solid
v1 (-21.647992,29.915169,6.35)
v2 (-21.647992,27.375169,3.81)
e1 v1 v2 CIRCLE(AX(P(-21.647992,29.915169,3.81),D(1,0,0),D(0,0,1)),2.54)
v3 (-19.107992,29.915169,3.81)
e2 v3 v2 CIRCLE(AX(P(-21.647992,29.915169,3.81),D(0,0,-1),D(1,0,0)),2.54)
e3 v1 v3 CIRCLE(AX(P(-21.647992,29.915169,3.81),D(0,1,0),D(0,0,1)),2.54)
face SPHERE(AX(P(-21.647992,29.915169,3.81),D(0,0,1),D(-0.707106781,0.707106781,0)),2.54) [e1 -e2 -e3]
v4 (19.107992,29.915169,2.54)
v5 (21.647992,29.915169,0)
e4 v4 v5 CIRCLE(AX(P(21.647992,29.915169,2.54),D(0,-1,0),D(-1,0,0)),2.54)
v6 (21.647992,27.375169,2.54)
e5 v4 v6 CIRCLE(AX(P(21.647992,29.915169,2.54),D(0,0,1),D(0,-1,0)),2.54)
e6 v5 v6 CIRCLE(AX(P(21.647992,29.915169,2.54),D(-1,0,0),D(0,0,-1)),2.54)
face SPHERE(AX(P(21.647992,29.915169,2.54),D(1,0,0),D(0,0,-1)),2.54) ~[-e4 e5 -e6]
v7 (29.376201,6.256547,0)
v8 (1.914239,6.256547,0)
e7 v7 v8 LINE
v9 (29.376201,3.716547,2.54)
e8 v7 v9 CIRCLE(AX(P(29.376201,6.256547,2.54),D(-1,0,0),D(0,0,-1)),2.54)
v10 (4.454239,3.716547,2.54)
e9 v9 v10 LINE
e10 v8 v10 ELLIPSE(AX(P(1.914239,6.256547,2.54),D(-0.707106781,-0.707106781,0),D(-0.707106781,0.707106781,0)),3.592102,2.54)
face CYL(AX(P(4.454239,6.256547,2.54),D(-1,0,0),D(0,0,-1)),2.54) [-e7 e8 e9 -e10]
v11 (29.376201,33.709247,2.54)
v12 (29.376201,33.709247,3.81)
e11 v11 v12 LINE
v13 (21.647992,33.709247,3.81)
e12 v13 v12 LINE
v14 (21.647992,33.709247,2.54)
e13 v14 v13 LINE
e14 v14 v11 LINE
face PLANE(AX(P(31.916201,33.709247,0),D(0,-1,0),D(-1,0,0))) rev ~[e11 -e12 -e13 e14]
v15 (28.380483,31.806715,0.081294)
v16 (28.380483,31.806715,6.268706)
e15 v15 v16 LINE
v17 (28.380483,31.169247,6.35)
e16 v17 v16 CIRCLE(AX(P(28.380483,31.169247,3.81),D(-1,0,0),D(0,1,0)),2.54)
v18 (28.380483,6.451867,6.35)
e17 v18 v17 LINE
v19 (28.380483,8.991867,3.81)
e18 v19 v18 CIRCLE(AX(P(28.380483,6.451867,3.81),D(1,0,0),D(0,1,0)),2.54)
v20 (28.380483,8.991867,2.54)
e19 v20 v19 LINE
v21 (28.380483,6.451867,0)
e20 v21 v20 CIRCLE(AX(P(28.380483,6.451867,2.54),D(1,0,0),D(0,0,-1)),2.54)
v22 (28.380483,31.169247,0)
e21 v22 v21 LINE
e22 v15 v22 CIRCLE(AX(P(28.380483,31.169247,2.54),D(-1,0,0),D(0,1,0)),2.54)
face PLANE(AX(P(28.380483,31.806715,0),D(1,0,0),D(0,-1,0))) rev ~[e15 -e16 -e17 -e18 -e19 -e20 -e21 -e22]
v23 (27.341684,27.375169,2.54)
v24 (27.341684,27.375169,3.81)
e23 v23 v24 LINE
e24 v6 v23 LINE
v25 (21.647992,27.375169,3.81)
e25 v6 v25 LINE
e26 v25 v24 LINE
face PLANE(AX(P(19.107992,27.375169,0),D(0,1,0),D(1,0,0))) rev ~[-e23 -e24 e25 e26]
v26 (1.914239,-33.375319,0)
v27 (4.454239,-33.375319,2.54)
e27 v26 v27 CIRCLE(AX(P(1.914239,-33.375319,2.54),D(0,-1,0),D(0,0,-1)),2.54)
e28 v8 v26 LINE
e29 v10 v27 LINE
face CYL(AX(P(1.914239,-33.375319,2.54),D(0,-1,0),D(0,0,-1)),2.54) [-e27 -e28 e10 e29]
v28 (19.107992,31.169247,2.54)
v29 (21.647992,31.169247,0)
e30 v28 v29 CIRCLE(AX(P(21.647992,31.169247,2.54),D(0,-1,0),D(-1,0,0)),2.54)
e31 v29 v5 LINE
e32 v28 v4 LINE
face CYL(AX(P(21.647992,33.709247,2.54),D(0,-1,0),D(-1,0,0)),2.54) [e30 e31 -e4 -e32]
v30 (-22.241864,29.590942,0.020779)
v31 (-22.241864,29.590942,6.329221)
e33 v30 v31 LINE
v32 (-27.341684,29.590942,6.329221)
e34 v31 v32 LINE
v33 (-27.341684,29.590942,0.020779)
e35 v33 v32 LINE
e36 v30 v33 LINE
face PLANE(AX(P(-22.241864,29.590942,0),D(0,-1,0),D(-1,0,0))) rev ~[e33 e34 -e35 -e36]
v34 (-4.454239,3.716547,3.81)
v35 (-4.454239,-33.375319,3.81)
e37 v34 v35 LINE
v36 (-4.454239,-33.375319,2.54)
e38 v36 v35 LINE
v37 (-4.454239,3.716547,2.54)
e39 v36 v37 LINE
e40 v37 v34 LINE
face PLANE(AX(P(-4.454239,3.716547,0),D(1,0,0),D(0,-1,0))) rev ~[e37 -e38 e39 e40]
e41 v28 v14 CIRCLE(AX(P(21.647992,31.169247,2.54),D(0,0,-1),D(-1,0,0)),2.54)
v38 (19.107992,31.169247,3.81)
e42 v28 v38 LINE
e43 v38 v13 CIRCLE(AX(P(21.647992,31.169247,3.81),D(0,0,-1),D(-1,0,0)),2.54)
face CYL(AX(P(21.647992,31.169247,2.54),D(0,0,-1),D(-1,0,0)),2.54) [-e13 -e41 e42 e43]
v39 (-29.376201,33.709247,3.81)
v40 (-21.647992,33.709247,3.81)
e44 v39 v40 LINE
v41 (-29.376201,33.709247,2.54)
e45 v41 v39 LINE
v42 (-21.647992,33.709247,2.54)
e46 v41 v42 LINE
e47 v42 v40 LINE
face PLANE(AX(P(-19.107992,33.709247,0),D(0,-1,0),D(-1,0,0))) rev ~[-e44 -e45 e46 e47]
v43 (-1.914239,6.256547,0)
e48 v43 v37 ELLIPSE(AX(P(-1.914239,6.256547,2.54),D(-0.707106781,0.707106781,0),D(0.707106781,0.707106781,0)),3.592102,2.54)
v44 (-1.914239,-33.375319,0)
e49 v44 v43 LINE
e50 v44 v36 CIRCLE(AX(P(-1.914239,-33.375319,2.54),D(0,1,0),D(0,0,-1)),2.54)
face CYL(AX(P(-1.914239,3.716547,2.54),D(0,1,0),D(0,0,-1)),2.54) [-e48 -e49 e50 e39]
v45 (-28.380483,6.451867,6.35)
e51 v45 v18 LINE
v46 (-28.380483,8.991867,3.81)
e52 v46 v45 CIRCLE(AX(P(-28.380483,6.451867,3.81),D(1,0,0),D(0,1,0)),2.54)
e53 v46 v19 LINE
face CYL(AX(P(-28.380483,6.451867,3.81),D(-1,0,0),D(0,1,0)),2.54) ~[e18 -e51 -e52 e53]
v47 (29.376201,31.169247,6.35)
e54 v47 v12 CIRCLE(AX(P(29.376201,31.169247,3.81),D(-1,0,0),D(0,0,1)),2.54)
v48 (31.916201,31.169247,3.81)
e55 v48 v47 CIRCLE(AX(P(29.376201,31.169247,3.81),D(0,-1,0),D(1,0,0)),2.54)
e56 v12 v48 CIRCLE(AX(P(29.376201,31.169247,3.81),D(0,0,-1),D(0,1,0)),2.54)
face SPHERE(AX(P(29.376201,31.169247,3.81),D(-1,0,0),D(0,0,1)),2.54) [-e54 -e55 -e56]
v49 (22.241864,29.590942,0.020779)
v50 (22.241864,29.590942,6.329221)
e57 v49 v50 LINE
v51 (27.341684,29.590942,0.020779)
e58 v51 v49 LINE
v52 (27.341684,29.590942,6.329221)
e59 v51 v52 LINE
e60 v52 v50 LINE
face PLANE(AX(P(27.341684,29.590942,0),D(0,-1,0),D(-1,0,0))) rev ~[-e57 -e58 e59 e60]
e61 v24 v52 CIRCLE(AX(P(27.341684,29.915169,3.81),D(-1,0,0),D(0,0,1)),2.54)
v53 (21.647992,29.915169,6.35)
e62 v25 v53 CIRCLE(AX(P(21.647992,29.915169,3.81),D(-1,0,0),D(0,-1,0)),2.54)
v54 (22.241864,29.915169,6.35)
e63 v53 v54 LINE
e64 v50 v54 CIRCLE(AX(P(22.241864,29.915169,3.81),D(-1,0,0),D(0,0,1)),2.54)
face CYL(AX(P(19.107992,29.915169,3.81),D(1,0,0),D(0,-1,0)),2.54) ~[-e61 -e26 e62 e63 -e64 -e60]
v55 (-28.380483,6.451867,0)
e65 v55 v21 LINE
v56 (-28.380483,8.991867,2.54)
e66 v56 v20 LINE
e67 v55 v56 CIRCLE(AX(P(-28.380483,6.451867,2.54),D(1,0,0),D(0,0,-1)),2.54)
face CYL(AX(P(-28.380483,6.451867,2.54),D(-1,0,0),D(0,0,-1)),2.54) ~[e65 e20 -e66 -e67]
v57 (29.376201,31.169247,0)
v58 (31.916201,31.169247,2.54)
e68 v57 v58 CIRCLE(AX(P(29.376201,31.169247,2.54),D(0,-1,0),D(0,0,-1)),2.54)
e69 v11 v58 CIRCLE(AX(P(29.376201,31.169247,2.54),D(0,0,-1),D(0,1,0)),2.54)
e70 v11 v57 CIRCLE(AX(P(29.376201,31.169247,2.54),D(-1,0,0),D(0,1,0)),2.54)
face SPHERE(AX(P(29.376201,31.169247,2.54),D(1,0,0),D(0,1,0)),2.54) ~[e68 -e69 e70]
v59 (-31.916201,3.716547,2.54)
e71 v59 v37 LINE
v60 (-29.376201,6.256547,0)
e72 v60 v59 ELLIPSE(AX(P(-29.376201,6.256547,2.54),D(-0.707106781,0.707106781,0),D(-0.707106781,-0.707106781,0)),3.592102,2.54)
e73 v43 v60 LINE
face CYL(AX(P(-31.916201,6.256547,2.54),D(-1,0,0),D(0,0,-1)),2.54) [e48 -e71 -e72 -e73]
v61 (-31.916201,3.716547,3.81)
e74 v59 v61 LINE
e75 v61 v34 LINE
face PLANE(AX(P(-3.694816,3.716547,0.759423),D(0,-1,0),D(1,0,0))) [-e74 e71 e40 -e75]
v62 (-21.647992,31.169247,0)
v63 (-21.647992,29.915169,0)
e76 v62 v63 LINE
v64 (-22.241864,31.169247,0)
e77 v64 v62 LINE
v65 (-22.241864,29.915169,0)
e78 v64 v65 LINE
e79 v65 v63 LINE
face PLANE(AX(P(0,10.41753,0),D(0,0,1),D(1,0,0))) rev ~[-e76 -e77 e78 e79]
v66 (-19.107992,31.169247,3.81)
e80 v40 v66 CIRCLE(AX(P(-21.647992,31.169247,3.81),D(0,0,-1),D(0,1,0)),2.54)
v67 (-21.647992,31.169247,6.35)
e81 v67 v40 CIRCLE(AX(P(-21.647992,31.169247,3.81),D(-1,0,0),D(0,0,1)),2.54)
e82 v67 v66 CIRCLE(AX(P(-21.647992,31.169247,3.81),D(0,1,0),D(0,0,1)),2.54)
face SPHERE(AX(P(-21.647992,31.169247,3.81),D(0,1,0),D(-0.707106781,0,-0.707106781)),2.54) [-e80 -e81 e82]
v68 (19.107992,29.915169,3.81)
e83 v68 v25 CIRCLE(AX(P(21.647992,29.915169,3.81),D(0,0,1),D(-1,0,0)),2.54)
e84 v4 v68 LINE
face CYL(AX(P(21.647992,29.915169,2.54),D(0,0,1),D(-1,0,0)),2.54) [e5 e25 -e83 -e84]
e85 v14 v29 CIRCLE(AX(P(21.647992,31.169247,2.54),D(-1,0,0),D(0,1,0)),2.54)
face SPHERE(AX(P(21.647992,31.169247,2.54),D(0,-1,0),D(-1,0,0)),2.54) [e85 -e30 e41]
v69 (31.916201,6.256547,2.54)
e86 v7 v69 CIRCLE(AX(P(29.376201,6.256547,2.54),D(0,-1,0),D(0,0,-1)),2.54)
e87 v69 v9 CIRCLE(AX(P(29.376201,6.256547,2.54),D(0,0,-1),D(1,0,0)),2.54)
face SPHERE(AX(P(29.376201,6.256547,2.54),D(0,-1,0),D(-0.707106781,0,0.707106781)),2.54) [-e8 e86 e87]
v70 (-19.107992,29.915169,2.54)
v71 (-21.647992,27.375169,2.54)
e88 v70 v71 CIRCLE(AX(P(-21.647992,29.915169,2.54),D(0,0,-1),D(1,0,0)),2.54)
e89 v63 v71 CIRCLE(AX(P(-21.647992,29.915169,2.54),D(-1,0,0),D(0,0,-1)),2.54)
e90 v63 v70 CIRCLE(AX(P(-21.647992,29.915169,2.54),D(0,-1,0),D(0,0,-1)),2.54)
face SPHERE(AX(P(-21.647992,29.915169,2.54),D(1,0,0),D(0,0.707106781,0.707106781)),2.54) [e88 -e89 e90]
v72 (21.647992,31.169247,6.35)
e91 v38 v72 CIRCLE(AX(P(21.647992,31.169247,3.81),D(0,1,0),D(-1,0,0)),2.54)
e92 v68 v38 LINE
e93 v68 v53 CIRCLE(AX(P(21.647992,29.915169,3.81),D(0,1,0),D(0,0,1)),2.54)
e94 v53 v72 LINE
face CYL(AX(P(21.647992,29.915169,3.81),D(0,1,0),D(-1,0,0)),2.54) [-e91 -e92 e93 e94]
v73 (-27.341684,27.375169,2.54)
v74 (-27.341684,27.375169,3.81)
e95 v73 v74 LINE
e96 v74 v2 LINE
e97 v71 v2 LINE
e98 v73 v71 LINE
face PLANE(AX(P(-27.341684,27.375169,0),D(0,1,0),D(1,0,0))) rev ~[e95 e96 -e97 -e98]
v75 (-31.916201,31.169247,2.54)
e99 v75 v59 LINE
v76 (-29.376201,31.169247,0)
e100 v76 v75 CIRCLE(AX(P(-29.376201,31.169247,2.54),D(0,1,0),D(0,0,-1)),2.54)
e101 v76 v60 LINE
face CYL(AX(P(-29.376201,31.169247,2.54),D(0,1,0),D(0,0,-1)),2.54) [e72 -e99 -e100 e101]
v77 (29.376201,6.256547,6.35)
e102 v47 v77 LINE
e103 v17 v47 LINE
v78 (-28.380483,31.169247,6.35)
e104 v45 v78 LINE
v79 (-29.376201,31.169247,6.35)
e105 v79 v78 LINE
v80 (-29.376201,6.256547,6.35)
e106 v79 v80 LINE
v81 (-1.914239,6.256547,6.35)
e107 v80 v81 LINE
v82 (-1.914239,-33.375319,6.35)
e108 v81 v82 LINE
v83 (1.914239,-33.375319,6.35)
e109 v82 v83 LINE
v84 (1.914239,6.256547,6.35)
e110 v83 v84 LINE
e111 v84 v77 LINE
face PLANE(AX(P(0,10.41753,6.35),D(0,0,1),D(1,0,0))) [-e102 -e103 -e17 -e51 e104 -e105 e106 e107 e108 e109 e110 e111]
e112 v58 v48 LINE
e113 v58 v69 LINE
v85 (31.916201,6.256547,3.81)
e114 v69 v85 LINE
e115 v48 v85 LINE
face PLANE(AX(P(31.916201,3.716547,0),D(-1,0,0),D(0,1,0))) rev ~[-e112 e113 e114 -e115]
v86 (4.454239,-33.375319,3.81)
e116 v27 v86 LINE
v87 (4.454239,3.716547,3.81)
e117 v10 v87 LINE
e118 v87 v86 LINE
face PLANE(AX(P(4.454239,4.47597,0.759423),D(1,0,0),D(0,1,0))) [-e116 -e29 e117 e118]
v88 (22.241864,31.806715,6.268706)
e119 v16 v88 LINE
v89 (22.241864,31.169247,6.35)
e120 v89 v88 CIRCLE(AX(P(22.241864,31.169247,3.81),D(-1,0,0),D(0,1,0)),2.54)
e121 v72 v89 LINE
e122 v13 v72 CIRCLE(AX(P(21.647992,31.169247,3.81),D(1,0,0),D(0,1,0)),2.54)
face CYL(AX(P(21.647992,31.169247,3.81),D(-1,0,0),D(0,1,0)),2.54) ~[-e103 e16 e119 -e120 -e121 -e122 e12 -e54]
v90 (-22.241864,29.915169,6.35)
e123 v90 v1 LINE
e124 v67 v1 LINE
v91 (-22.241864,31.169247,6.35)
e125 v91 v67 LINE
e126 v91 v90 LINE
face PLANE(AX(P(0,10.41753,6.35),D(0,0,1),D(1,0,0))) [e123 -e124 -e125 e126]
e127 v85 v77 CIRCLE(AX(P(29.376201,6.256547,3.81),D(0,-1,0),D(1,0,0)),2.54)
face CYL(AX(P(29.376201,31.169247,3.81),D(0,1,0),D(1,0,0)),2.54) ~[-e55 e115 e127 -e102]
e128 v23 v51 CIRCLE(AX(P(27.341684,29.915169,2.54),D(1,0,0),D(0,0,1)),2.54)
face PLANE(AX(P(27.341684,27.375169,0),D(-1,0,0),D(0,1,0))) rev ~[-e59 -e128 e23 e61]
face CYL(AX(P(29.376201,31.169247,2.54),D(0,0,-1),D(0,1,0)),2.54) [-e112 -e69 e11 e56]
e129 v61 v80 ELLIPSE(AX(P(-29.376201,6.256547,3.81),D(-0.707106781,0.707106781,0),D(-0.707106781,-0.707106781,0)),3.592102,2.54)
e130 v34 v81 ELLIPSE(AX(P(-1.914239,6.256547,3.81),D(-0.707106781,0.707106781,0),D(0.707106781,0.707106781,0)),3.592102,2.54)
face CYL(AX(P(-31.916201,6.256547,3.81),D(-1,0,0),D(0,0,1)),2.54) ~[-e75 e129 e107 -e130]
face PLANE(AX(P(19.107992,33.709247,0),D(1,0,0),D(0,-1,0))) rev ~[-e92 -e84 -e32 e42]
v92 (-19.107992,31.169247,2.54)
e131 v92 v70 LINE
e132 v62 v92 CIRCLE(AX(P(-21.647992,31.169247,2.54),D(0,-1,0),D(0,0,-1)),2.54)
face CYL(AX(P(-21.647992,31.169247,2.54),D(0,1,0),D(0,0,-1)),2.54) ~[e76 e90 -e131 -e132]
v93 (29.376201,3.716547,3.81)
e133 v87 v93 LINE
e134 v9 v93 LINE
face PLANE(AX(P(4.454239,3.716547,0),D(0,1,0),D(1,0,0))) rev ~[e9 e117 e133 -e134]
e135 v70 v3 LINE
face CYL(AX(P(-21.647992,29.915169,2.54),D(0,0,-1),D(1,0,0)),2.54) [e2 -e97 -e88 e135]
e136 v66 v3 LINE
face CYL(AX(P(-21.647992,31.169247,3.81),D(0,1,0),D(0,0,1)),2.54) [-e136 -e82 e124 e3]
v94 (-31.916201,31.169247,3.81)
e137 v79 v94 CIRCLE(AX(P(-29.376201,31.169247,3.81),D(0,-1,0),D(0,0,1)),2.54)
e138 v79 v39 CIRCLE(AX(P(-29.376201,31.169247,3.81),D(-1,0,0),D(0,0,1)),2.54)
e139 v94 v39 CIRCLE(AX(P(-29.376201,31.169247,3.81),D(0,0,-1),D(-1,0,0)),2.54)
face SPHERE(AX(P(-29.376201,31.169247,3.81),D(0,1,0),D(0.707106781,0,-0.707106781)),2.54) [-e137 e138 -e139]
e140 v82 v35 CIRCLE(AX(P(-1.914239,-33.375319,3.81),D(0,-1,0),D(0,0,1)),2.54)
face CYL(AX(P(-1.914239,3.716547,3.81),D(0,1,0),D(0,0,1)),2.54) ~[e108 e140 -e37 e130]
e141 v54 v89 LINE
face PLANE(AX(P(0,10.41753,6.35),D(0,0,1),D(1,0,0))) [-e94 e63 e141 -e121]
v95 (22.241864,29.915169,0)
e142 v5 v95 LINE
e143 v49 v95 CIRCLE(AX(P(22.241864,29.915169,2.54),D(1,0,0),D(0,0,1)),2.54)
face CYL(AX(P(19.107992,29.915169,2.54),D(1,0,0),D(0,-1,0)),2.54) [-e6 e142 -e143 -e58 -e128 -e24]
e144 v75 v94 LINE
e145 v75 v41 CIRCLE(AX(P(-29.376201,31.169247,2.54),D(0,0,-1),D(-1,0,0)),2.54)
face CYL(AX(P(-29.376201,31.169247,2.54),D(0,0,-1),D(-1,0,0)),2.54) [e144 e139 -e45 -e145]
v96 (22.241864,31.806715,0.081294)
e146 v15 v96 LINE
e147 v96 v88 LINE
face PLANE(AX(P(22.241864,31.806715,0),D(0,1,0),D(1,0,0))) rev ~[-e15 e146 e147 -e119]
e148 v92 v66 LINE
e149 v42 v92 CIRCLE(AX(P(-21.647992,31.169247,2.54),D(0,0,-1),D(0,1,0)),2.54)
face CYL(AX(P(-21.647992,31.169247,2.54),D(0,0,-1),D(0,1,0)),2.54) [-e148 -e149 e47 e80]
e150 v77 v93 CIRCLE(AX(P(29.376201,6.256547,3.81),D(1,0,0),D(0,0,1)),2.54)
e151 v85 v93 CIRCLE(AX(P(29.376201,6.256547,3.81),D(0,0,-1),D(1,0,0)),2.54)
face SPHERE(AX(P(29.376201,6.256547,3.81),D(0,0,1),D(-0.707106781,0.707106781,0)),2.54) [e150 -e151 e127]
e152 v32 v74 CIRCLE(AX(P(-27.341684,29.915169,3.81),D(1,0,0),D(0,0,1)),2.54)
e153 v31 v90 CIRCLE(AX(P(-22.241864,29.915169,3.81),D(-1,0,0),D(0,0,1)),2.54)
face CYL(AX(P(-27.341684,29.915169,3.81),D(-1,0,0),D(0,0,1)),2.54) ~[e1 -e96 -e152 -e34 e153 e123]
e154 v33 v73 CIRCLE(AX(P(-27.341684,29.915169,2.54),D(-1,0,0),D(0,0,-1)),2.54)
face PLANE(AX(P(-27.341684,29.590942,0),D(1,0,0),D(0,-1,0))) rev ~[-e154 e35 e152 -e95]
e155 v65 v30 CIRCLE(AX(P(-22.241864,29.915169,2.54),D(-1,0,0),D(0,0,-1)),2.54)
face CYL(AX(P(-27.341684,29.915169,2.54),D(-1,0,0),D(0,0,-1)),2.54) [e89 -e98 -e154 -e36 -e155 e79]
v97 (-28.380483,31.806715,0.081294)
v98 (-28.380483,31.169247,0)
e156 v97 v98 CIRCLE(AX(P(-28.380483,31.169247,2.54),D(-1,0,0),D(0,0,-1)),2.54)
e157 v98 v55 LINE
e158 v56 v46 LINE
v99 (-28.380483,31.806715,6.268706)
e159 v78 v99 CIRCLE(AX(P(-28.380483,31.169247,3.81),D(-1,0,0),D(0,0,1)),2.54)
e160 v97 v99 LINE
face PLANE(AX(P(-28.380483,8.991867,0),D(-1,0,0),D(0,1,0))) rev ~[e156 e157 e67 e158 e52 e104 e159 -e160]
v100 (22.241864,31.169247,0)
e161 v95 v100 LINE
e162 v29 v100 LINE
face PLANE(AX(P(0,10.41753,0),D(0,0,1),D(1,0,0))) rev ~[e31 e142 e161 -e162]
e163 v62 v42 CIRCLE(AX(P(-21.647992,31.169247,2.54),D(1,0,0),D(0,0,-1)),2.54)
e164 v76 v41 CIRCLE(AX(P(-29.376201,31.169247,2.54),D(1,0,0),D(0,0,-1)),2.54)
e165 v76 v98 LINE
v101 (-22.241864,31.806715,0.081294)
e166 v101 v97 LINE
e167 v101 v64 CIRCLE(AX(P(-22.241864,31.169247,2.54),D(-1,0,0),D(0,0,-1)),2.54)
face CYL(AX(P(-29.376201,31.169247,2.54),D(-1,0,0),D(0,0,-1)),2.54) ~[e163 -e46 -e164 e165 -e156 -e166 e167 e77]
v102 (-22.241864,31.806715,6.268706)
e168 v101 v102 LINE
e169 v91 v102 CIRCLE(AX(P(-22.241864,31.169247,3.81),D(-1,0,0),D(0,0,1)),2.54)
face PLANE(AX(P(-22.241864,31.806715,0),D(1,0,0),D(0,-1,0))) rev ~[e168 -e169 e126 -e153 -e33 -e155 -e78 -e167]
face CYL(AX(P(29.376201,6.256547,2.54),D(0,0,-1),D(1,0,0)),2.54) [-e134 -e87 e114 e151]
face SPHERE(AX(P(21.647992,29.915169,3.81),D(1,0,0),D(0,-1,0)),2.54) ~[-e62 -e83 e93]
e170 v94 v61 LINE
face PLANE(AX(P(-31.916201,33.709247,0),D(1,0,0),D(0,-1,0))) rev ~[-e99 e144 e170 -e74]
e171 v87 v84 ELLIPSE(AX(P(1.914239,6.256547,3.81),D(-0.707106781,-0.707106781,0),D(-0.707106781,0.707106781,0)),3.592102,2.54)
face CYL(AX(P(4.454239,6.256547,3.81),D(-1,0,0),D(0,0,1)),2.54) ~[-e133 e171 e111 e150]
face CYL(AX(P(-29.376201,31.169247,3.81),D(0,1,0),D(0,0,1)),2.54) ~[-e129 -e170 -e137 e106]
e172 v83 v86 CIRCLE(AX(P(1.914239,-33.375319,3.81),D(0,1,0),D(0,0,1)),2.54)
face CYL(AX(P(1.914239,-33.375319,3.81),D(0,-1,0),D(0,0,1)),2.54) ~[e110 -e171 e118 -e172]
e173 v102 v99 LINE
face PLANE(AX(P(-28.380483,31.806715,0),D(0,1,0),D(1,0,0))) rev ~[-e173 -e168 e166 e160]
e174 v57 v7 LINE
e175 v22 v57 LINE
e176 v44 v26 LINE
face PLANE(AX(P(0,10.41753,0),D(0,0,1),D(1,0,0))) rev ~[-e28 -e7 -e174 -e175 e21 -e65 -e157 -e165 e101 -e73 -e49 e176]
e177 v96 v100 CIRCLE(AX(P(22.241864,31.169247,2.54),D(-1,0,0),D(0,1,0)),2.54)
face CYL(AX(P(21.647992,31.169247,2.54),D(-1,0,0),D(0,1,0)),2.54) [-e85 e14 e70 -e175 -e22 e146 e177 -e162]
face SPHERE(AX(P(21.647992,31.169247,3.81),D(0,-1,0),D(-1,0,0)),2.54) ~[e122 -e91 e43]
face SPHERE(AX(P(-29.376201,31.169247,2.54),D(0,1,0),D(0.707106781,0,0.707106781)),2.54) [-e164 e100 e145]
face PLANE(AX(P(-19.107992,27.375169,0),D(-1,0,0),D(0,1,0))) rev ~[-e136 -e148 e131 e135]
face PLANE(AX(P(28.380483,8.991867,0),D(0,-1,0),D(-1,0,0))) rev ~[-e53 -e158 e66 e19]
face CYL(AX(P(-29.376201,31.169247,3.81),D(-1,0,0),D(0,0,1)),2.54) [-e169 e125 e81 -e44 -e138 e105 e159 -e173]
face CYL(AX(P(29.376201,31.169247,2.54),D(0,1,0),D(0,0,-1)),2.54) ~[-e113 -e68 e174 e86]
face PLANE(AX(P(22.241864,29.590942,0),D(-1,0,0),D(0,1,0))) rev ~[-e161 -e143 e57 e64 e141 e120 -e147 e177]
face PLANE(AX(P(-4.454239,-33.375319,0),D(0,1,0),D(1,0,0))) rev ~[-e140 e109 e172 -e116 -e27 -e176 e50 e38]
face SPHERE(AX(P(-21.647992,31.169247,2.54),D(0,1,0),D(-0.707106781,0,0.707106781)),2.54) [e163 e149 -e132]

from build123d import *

# Parameters (mm, degrees)
F1_DEPTH      = 6.35
F2_F1_R       = 2.54
F2_F2_R       = 2.54
F2_F3_R       = 2.54
F2_T4_DEPTH   = 16.6182092851
F2_T6_DEPTH   = 1.27
F2_T9_ANGLE   = 90
F2_T11_ANGLE  = 90
F3_T1_DEPTH   = 5.693692497
F3_T3_DEPTH   = 1.2540775669
F3_T5_DEPTH   = 7.7282092851
F3_T7_DEPTH   = 1.27
F3_T9_DEPTH   = 24.9126996231
F3_T11_DEPTH  = 24.9219618431
F3_T13_DEPTH  = 37.0918661356
F3_T15_DEPTH  = 27.4619618431
F3_T17_DEPTH  = 27.4526996231
F3_T19_DEPTH  = 56.7609667778
F3_S23_W      = 2.5908
F3_S23_H      = 2.5908
F3_T24_DEPTH  = 2.5908
F3_S29_W      = 2.5908
F3_S29_H      = 2.5908
F3_T30_DEPTH  = 2.5908
F3_S35_W      = 2.5908
F3_S35_H      = 2.5908
F3_T36_DEPTH  = 2.5908
F3_S41_W      = 2.5908
F3_S41_H      = 2.5908
F3_T42_DEPTH  = 2.5908
F3_S47_W      = 2.5908
F3_S47_H      = 2.5908
F3_T48_DEPTH  = 2.5908
F3_S53_W      = 2.5908
F3_S53_H      = 2.5908
F3_T54_DEPTH  = 2.5908
F3_S59_W      = 2.5908
F3_S59_H      = 2.5908
F3_T60_DEPTH  = 2.5908
F3_S65_W      = 2.5908
F3_S65_H      = 2.5908
F3_T66_DEPTH  = 2.5908
F3_T70_ANGLE  = 90.0000000056
F3_T72_ANGLE  = 90.0000000056
F3_T77_DEPTH  = 31.2719618431
F3_T81_DEPTH  = 43.4418661356
F3_T88_DEPTH  = 43.4418661356
F3_T92_DEPTH  = 33.8119618431
F3_T99_DEPTH  = 33.8119618431
F3_T103_DEPTH = 33.8026996231
F3_T110_DEPTH = 31.2719618431
F3_T114_DEPTH = 43.4418661356
F3_T121_DEPTH = 43.4418661356
F3_T125_DEPTH = 33.8119618431
F3_T132_DEPTH = 33.8119618431
F3_T136_DEPTH = 33.8026996231


# Not quite as in the source:
# - a fillet or chamfer that OpenCascade refuses, or shapes differently, is made with other operations: its cross-section is extruded or revolved along the edge and cut away or added
# - two fillets or chamfers of one size are made in one step


with BuildPart() as f1:
    # F0 (on Top) → F1 (new body)
    with BuildSketch(Plane.XY):
        Polygon((-4.4542392716, -33.3753190935), (0, -33.3753190935), (4.4542392716, -33.3753190935), (4.4542392716, 3.7165470421), (31.9162011147, 3.7165470421), (31.9162011147, 8.9918673038), (31.9162011147, 33.7092466652), (28.3804833889, 33.7092466652), (19.1079918295, 33.7092466652), (19.1079918295, 31.8067148328), (19.1079918295, 27.3751690984), (22.2418643534, 27.3751690984), (27.3416843265, 27.3751690984), (27.3416843265, 29.5909419656), (22.2418643534, 29.5909419656), (22.2418643534, 31.8067148328), (28.3804833889, 31.8067148328), (28.3804833889, 8.9918673038), (4.4542392716, 8.9918673038), (0, 8.9918673038), (-4.4542392716, 8.9918673038), (-28.3804833889, 8.9918673038), (-28.3804833889, 31.8067148328), (-22.2418643534, 31.8067148328), (-22.2418643534, 29.5909419656), (-27.3416843265, 29.5909419656), (-27.3416843265, 27.3751690984), (-22.2418643534, 27.3751690984), (-19.1079918295, 27.3751690984), (-19.1079918295, 31.8067148328), (-19.1079918295, 33.7092466652), (-28.3804833889, 33.7092466652), (-31.9162011147, 33.7092466652), (-31.9162011147, 8.9918673038), (-31.9162011147, 3.7165470421), (-4.4542392716, 3.7165470421), align=None)
    extrude(amount=F1_DEPTH)

    # F2: fillet of radius 2.54 on 7 edges, made by hand

    # F2_f1
    f2_f1_edges = [f1.edges().sort_by_distance(p)[0] for p in [
        (23.224838078, 27.3751690984, 0),
    ]]
    fillet(f2_f1_edges, radius=F2_F1_R)

    # F2_f2
    f2_f2_edges = [f1.edges().sort_by_distance(p)[0] for p in [
        (23.224838078, 27.3751690984, 6.35),
    ]]
    fillet(f2_f2_edges, radius=F2_F2_R)

    # F2_f3
    f2_f3_edges = [f1.edges().sort_by_distance(p)[0] for p in [
        (19.1079918295, 27.3751690984, 3.175),
    ]]
    fillet(f2_f3_edges, radius=F2_F3_R)

    # F2_s5 → F2_t4 (cut)
    with BuildSketch(Plane.YZ.offset(21.6479918295)):
        with BuildLine():
            ThreePointArc((33.7092466652, 2.54), (32.9652978895, 0.7439487758), (31.1692466652, 0))
            Line((31.1692466652, 0), (31.1692466652, -0.0508))
            Line((31.1692466652, -0.0508), (33.7600466652, -0.0508))
            Line((33.7600466652, -0.0508), (33.7600466652, 2.54))
            Line((33.7600466652, 2.54), (33.7092466652, 2.54))
        make_face()
        with BuildLine():
            ThreePointArc((33.7092466652, 3.81), (32.9652978895, 5.6060512242), (31.1692466652, 6.35))
            Line((31.1692466652, 6.35), (31.1692466652, 6.4008))
            Line((31.1692466652, 6.4008), (33.7600466652, 6.4008))
            Line((33.7600466652, 6.4008), (33.7600466652, 3.81))
            Line((33.7600466652, 3.81), (33.7092466652, 3.81))
        make_face()
    extrude(amount=F2_T4_DEPTH, mode=Mode.SUBTRACT)

    # F2_s7 → F2_t6 (cut)
    with BuildSketch(Plane.XY.offset(2.54)):
        with BuildLine():
            ThreePointArc((19.1079918295, 31.1692466652), (19.8519406053, 32.9652978895), (21.6479918295, 33.7092466652))
            Line((21.6479918295, 33.7092466652), (21.6479918295, 33.7600466652))
            Line((21.6479918295, 33.7600466652), (19.0571918295, 33.7600466652))
            Line((19.0571918295, 33.7600466652), (19.0571918295, 31.1692466652))
            Line((19.0571918295, 31.1692466652), (19.1079918295, 31.1692466652))
        make_face()
    extrude(amount=F2_T6_DEPTH, mode=Mode.SUBTRACT)

    # F2_s8 → F2_t9 (revolve, cut)
    with BuildSketch(Plane.XY.offset(2.54)):
        with BuildLine():
            ThreePointArc((21.6479918295, 33.7092466652), (19.8519406053, 32.9652978895), (19.1079918295, 31.1692466652))
            Line((19.1079918295, 31.1692466652), (19.0571918295, 31.1692466652))
            Line((19.0571918295, 31.1692466652), (19.0571918295, 33.7600466652))
            Line((19.0571918295, 33.7600466652), (21.6479918295, 33.7600466652))
            Line((21.6479918295, 33.7600466652), (21.6479918295, 33.7092466652))
        make_face()
    revolve(axis=Axis((21.6479918295, 33.7092466652, 2.54), (0, -1, 0)), revolution_arc=F2_T9_ANGLE, mode=Mode.SUBTRACT)

    # F2_s10 → F2_t11 (revolve, cut)
    with BuildSketch(Plane.XY.offset(3.81)):
        with BuildLine():
            ThreePointArc((21.6479918295, 33.7092466652), (19.8519406053, 32.9652978895), (19.1079918295, 31.1692466652))
            Line((19.1079918295, 31.1692466652), (19.0571918295, 31.1692466652))
            Line((19.0571918295, 31.1692466652), (19.0571918295, 33.7600466652))
            Line((19.0571918295, 33.7600466652), (21.6479918295, 33.7600466652))
            Line((21.6479918295, 33.7600466652), (21.6479918295, 33.7092466652))
        make_face()
    revolve(axis=Axis((21.6479918295, 33.7092466652, 3.81), (0, 1, 0)), revolution_arc=F2_T11_ANGLE, mode=Mode.SUBTRACT)

    # F3: fillet of radius 2.54 on 27 edges, made by hand

    # F3_s2 → F3_t1 (cut)
    with BuildSketch(Plane.YZ.offset(-27.3416843265)):
        with BuildLine():
            ThreePointArc((29.9151690984, 0), (28.1191178742, 0.7439487758), (27.3751690984, 2.54))
            Line((27.3751690984, 2.54), (27.3243690984, 2.54))
            Line((27.3243690984, 2.54), (27.3243690984, -0.0508))
            Line((27.3243690984, -0.0508), (29.9151690984, -0.0508))
            Line((29.9151690984, -0.0508), (29.9151690984, 0))
        make_face()
        with BuildLine():
            ThreePointArc((29.9151690984, 6.35), (28.1191178742, 5.6060512242), (27.3751690984, 3.81))
            Line((27.3751690984, 3.81), (27.3243690984, 3.81))
            Line((27.3243690984, 3.81), (27.3243690984, 6.4008))
            Line((27.3243690984, 6.4008), (29.9151690984, 6.4008))
            Line((29.9151690984, 6.4008), (29.9151690984, 6.35))
        make_face()
    extrude(amount=F3_T1_DEPTH, mode=Mode.SUBTRACT)

    # F3_s4 → F3_t3 (cut)
    with BuildSketch(Plane.XZ.offset(-31.1692466652)):
        with BuildLine():
            ThreePointArc((-21.6479918295, 6.35), (-19.8519406053, 5.6060512242), (-19.1079918295, 3.81))
            Line((-19.1079918295, 3.81), (-19.0571918295, 3.81))
            Line((-19.0571918295, 3.81), (-19.0571918295, 6.4008))
            Line((-19.0571918295, 6.4008), (-21.6479918295, 6.4008))
            Line((-21.6479918295, 6.4008), (-21.6479918295, 6.35))
        make_face()
        with BuildLine():
            ThreePointArc((-21.6479918295, 0), (-19.8519406053, 0.7439487758), (-19.1079918295, 2.54))
            Line((-19.1079918295, 2.54), (-19.0571918295, 2.54))
            Line((-19.0571918295, 2.54), (-19.0571918295, -0.0508))
            Line((-19.0571918295, -0.0508), (-21.6479918295, -0.0508))
            Line((-21.6479918295, -0.0508), (-21.6479918295, 0))
        make_face()
    extrude(amount=F3_T3_DEPTH, mode=Mode.SUBTRACT)

    # F3_s6 → F3_t5 (cut)
    with BuildSketch(Plane.YZ.offset(-29.3762011147)):
        with BuildLine():
            ThreePointArc((31.1692466652, 6.35), (32.9652978895, 5.6060512242), (33.7092466652, 3.81))
            Line((33.7092466652, 3.81), (33.7600466652, 3.81))
            Line((33.7600466652, 3.81), (33.7600466652, 6.4008))
            Line((33.7600466652, 6.4008), (31.1692466652, 6.4008))
            Line((31.1692466652, 6.4008), (31.1692466652, 6.35))
        make_face()
        with BuildLine():
            ThreePointArc((31.1692466652, 0), (32.9652978895, 0.7439487758), (33.7092466652, 2.54))
            Line((33.7092466652, 2.54), (33.7600466652, 2.54))
            Line((33.7600466652, 2.54), (33.7600466652, -0.0508))
            Line((33.7600466652, -0.0508), (31.1692466652, -0.0508))
            Line((31.1692466652, -0.0508), (31.1692466652, 0))
        make_face()
    extrude(amount=F3_T5_DEPTH, mode=Mode.SUBTRACT)

    # F3_s8 → F3_t7 (cut)
    with BuildSketch(Plane.XY.offset(2.54)):
        with BuildLine():
            ThreePointArc((-21.6479918295, 33.7092466652), (-19.8519406053, 32.9652978895), (-19.1079918295, 31.1692466652))
            Line((-19.1079918295, 31.1692466652), (-19.0571918295, 31.1692466652))
            Line((-19.0571918295, 31.1692466652), (-19.0571918295, 33.7600466652))
            Line((-19.0571918295, 33.7600466652), (-21.6479918295, 33.7600466652))
            Line((-21.6479918295, 33.7600466652), (-21.6479918295, 33.7092466652))
        make_face()
        with BuildLine():
            ThreePointArc((-31.9162011147, 31.1692466652), (-31.1722523389, 32.9652978895), (-29.3762011147, 33.7092466652))
            Line((-29.3762011147, 33.7092466652), (-29.3762011147, 33.7600466652))
            Line((-29.3762011147, 33.7600466652), (-31.9670011147, 33.7600466652))
            Line((-31.9670011147, 33.7600466652), (-31.9670011147, 31.1692466652))
            Line((-31.9670011147, 31.1692466652), (-31.9162011147, 31.1692466652))
        make_face()
        with BuildLine():
            ThreePointArc((29.3762011147, 33.7092466652), (31.1722523389, 32.9652978895), (31.9162011147, 31.1692466652))
            Line((31.9162011147, 31.1692466652), (31.9670011147, 31.1692466652))
            Line((31.9670011147, 31.1692466652), (31.9670011147, 33.7600466652))
            Line((31.9670011147, 33.7600466652), (29.3762011147, 33.7600466652))
            Line((29.3762011147, 33.7600466652), (29.3762011147, 33.7092466652))
        make_face()
        with BuildLine():
            ThreePointArc((31.9162011147, 6.2565470421), (31.1722523389, 4.4604958179), (29.3762011147, 3.7165470421))
            Line((29.3762011147, 3.7165470421), (29.3762011147, 3.6657470421))
            Line((29.3762011147, 3.6657470421), (31.9670011147, 3.6657470421))
            Line((31.9670011147, 3.6657470421), (31.9670011147, 6.2565470421))
            Line((31.9670011147, 6.2565470421), (31.9162011147, 6.2565470421))
        make_face()
        with BuildLine():
            ThreePointArc((-19.1079918295, 29.9151690984), (-19.8519406053, 28.1191178742), (-21.6479918295, 27.3751690984))
            Line((-21.6479918295, 27.3751690984), (-21.6479918295, 27.3243690984))
            Line((-21.6479918295, 27.3243690984), (-19.0571918295, 27.3243690984))
            Line((-19.0571918295, 27.3243690984), (-19.0571918295, 29.9151690984))
            Line((-19.0571918295, 29.9151690984), (-19.1079918295, 29.9151690984))
        make_face()
    extrude(amount=F3_T7_DEPTH, mode=Mode.SUBTRACT)

    # F3_s10 → F3_t9 (cut)
    with BuildSketch(Plane.XZ.offset(-31.1692466652)):
        with BuildLine():
            ThreePointArc((29.3762011147, 0), (31.1722523389, 0.7439487758), (31.9162011147, 2.54))
            Line((31.9162011147, 2.54), (31.9670011147, 2.54))
            Line((31.9670011147, 2.54), (31.9670011147, -0.0508))
            Line((31.9670011147, -0.0508), (29.3762011147, -0.0508))
            Line((29.3762011147, -0.0508), (29.3762011147, 0))
        make_face()
        with BuildLine():
            ThreePointArc((31.9162011147, 3.81), (31.1722523389, 5.6060512242), (29.3762011147, 6.35))
            Line((29.3762011147, 6.35), (29.3762011147, 6.4008))
            Line((29.3762011147, 6.4008), (31.9670011147, 6.4008))
            Line((31.9670011147, 6.4008), (31.9670011147, 3.81))
            Line((31.9670011147, 3.81), (31.9162011147, 3.81))
        make_face()
    extrude(amount=F3_T9_DEPTH, mode=Mode.SUBTRACT)

    # F3_s12 → F3_t11 (cut)
    with BuildSketch(Plane.YZ.offset(4.4542392716)):
        with BuildLine():
            ThreePointArc((6.2565470421, 0), (4.4604958179, 0.7439487758), (3.7165470421, 2.54))
            Line((3.7165470421, 2.54), (3.6657470421, 2.54))
            Line((3.6657470421, 2.54), (3.6657470421, -0.0508))
            Line((3.6657470421, -0.0508), (6.2565470421, -0.0508))
            Line((6.2565470421, -0.0508), (6.2565470421, 0))
        make_face()
        with BuildLine():
            ThreePointArc((6.2565470421, 6.35), (4.4604958179, 5.6060512242), (3.7165470421, 3.81))
            Line((3.7165470421, 3.81), (3.6657470421, 3.81))
            Line((3.6657470421, 3.81), (3.6657470421, 6.4008))
            Line((3.6657470421, 6.4008), (6.2565470421, 6.4008))
            Line((6.2565470421, 6.4008), (6.2565470421, 6.35))
        make_face()
    extrude(amount=F3_T11_DEPTH, mode=Mode.SUBTRACT)

    # F3_s14 → F3_t13 (cut)
    with BuildSketch(Plane.XZ.offset(-3.7165470421)):
        with BuildLine():
            ThreePointArc((1.9142392716, 0), (3.7102904958, 0.7439487758), (4.4542392716, 2.54))
            Line((4.4542392716, 2.54), (4.5050392716, 2.54))
            Line((4.5050392716, 2.54), (4.5050392716, -0.0508))
            Line((4.5050392716, -0.0508), (1.9142392716, -0.0508))
            Line((1.9142392716, -0.0508), (1.9142392716, 0))
        make_face()
        with BuildLine():
            ThreePointArc((-1.9142392716, 0), (-3.7102904958, 0.7439487758), (-4.4542392716, 2.54))
            Line((-4.4542392716, 2.54), (-4.5050392716, 2.54))
            Line((-4.5050392716, 2.54), (-4.5050392716, -0.0508))
            Line((-4.5050392716, -0.0508), (-1.9142392716, -0.0508))
            Line((-1.9142392716, -0.0508), (-1.9142392716, 0))
        make_face()
        with BuildLine():
            ThreePointArc((1.9142392716, 6.35), (3.7102904958, 5.6060512242), (4.4542392716, 3.81))
            Line((4.4542392716, 3.81), (4.5050392716, 3.81))
            Line((4.5050392716, 3.81), (4.5050392716, 6.4008))
            Line((4.5050392716, 6.4008), (1.9142392716, 6.4008))
            Line((1.9142392716, 6.4008), (1.9142392716, 6.35))
        make_face()
        with BuildLine():
            ThreePointArc((-1.9142392716, 6.35), (-3.7102904958, 5.6060512242), (-4.4542392716, 3.81))
            Line((-4.4542392716, 3.81), (-4.5050392716, 3.81))
            Line((-4.5050392716, 3.81), (-4.5050392716, 6.4008))
            Line((-4.5050392716, 6.4008), (-1.9142392716, 6.4008))
            Line((-1.9142392716, 6.4008), (-1.9142392716, 6.35))
        make_face()
    extrude(amount=F3_T13_DEPTH, mode=Mode.SUBTRACT)

    # F3_s16 → F3_t15 (cut)
    with BuildSketch(Plane.YZ.offset(-31.9162011147)):
        with BuildLine():
            ThreePointArc((6.2565470421, 0), (4.4604958179, 0.7439487758), (3.7165470421, 2.54))
            Line((3.7165470421, 2.54), (3.6657470421, 2.54))
            Line((3.6657470421, 2.54), (3.6657470421, -0.0508))
            Line((3.6657470421, -0.0508), (6.2565470421, -0.0508))
            Line((6.2565470421, -0.0508), (6.2565470421, 0))
        make_face()
        with BuildLine():
            ThreePointArc((6.2565470421, 6.35), (4.4604958179, 5.6060512242), (3.7165470421, 3.81))
            Line((3.7165470421, 3.81), (3.6657470421, 3.81))
            Line((3.6657470421, 3.81), (3.6657470421, 6.4008))
            Line((3.6657470421, 6.4008), (6.2565470421, 6.4008))
            Line((6.2565470421, 6.4008), (6.2565470421, 6.35))
        make_face()
    extrude(amount=F3_T15_DEPTH, mode=Mode.SUBTRACT)

    # F3_s18 → F3_t17 (cut)
    with BuildSketch(Plane.XZ.offset(-31.1692466652)):
        with BuildLine():
            ThreePointArc((-29.3762011147, 0), (-31.1722523389, 0.7439487758), (-31.9162011147, 2.54))
            Line((-31.9162011147, 2.54), (-31.9670011147, 2.54))
            Line((-31.9670011147, 2.54), (-31.9670011147, -0.0508))
            Line((-31.9670011147, -0.0508), (-29.3762011147, -0.0508))
            Line((-29.3762011147, -0.0508), (-29.3762011147, 0))
        make_face()
        with BuildLine():
            ThreePointArc((-29.3762011147, 6.35), (-31.1722523389, 5.6060512242), (-31.9162011147, 3.81))
            Line((-31.9162011147, 3.81), (-31.9670011147, 3.81))
            Line((-31.9670011147, 3.81), (-31.9670011147, 6.4008))
            Line((-31.9670011147, 6.4008), (-29.3762011147, 6.4008))
            Line((-29.3762011147, 6.4008), (-29.3762011147, 6.35))
        make_face()
    extrude(amount=F3_T17_DEPTH, mode=Mode.SUBTRACT)

    # F3_s20 → F3_t19 (cut)
    with BuildSketch(Plane.YZ.offset(-28.3804833889)):
        with BuildLine():
            ThreePointArc((6.4518673038, 0), (8.2479185281, 0.7439487758), (8.9918673038, 2.54))
            Line((8.9918673038, 2.54), (9.0426673038, 2.54))
            Line((9.0426673038, 2.54), (9.0426673038, -0.0508))
            Line((9.0426673038, -0.0508), (6.4518673038, -0.0508))
            Line((6.4518673038, -0.0508), (6.4518673038, 0))
        make_face()
        with BuildLine():
            ThreePointArc((8.9918673038, 3.81), (8.2479185281, 5.6060512242), (6.4518673038, 6.35))
            Line((6.4518673038, 6.35), (6.4518673038, 6.4008))
            Line((6.4518673038, 6.4008), (9.0426673038, 6.4008))
            Line((9.0426673038, 6.4008), (9.0426673038, 3.81))
            Line((9.0426673038, 3.81), (8.9918673038, 3.81))
        make_face()
    extrude(amount=F3_T19_DEPTH, mode=Mode.SUBTRACT)


with BuildPart() as f3_tool22:
    # F3_s23 → F3_t24 (new body)
    with BuildSketch(Plane.YZ.offset(-21.6479918295)):
        with Locations((28.6197690984, 1.2446)):
            Rectangle(F3_S23_W, F3_S23_H)
    extrude(amount=F3_T24_DEPTH)

    # F3_s25 → F3_t26 (revolve, cut)
    with BuildSketch(Plane(origin=(-21.6479918295, 29.9151690984, 2.54), x_dir=(0, 0.7071067812, 0.7071067812), z_dir=(0, 0.7071067812, -0.7071067812))):
        with BuildLine():
            ThreePointArc((0, -2.54), (2.54, 0), (0, 2.54))
            Line((0, 2.54), (0, -2.54))
        make_face()
    revolve(axis=Axis((-21.6479918295, 29.9151690984, 2.54), (1, 0, 0)), mode=Mode.SUBTRACT)


with BuildPart() as f1_1:
    add(f1.part)

    # F3_t21: cut F3_tool22
    add(f3_tool22.part, mode=Mode.SUBTRACT)


with BuildPart() as f3_tool28:
    # F3_s29 → F3_t30 (new body)
    with BuildSketch(Plane.XY.offset(3.81)):
        with Locations((-20.3525918295, 28.6197690984)):
            Rectangle(F3_S29_W, F3_S29_H)
    extrude(amount=F3_T30_DEPTH)

    # F3_s31 → F3_t32 (revolve, cut)
    with BuildSketch(Plane(origin=(-21.6479918295, 29.9151690984, 3.81), x_dir=(-0.7071067812, 0.7071067812, 0), z_dir=(0.7071067812, 0.7071067812, 0))):
        with BuildLine():
            ThreePointArc((0, -2.54), (2.54, 0), (0, 2.54))
            Line((0, 2.54), (0, -2.54))
        make_face()
    revolve(axis=Axis((-21.6479918295, 29.9151690984, 3.81), (0, 0, 1)), mode=Mode.SUBTRACT)


with BuildPart() as f1_2:
    add(f1_1.part)

    # F3_t27: cut F3_tool28
    add(f3_tool28.part, mode=Mode.SUBTRACT)


with BuildPart() as f3_tool34:
    # F3_s35 → F3_t36 (new body)
    with BuildSketch(Plane.XZ.offset(-31.1692466652)):
        with Locations((-20.3525918295, 5.1054)):
            Rectangle(F3_S35_W, F3_S35_H)
    extrude(amount=-F3_T36_DEPTH)

    # F3_s37 → F3_t38 (revolve, cut)
    with BuildSketch(Plane(origin=(-21.6479918295, 31.1692466652, 3.81), x_dir=(-0.7071067812, 0, -0.7071067812), z_dir=(0.7071067812, 0, -0.7071067812))):
        with BuildLine():
            ThreePointArc((0, -2.54), (2.54, 0), (0, 2.54))
            Line((0, 2.54), (0, -2.54))
        make_face()
    revolve(axis=Axis((-21.6479918295, 31.1692466652, 3.81), (0, 1, 0)), mode=Mode.SUBTRACT)


with BuildPart() as f1_3:
    add(f1_2.part)

    # F3_t33: cut F3_tool34
    add(f3_tool34.part, mode=Mode.SUBTRACT)


with BuildPart() as f3_tool40:
    # F3_s41 → F3_t42 (new body)
    with BuildSketch(Plane.XZ.offset(-31.1692466652)):
        with Locations((-20.3525918295, 1.2446)):
            Rectangle(F3_S41_W, F3_S41_H)
    extrude(amount=-F3_T42_DEPTH)

    # F3_s43 → F3_t44 (revolve, cut)
    with BuildSketch(Plane(origin=(-21.6479918295, 31.1692466652, 2.54), x_dir=(-0.7071067812, 0, 0.7071067812), z_dir=(-0.7071067812, 0, -0.7071067812))):
        with BuildLine():
            ThreePointArc((0, -2.54), (2.54, 0), (0, 2.54))
            Line((0, 2.54), (0, -2.54))
        make_face()
    revolve(axis=Axis((-21.6479918295, 31.1692466652, 2.54), (0, 1, 0)), mode=Mode.SUBTRACT)


with BuildPart() as f1_4:
    add(f1_3.part)

    # F3_t39: cut F3_tool40
    add(f3_tool40.part, mode=Mode.SUBTRACT)


with BuildPart() as f3_tool46:
    # F3_s47 → F3_t48 (new body)
    with BuildSketch(Plane.XZ.offset(-31.1692466652)):
        with Locations((-30.6716011147, 5.1054)):
            Rectangle(F3_S47_W, F3_S47_H)
    extrude(amount=-F3_T48_DEPTH)

    # F3_s49 → F3_t50 (revolve, cut)
    with BuildSketch(Plane(origin=(-29.3762011147, 31.1692466652, 3.81), x_dir=(0.7071067812, 0, -0.7071067812), z_dir=(0.7071067812, 0, 0.7071067812))):
        with BuildLine():
            ThreePointArc((0, -2.54), (2.54, 0), (0, 2.54))
            Line((0, 2.54), (0, -2.54))
        make_face()
    revolve(axis=Axis((-29.3762011147, 31.1692466652, 3.81), (0, 1, 0)), mode=Mode.SUBTRACT)


with BuildPart() as f1_5:
    add(f1_4.part)

    # F3_t45: cut F3_tool46
    add(f3_tool46.part, mode=Mode.SUBTRACT)


with BuildPart() as f3_tool52:
    # F3_s53 → F3_t54 (new body)
    with BuildSketch(Plane.XZ.offset(-31.1692466652)):
        with Locations((-30.6716011147, 1.2446)):
            Rectangle(F3_S53_W, F3_S53_H)
    extrude(amount=-F3_T54_DEPTH)

    # F3_s55 → F3_t56 (revolve, cut)
    with BuildSketch(Plane(origin=(-29.3762011147, 31.1692466652, 2.54), x_dir=(0.7071067812, 0, 0.7071067812), z_dir=(-0.7071067812, 0, 0.7071067812))):
        with BuildLine():
            ThreePointArc((0, -2.54), (2.54, 0), (0, 2.54))
            Line((0, 2.54), (0, -2.54))
        make_face()
    revolve(axis=Axis((-29.3762011147, 31.1692466652, 2.54), (0, 1, 0)), mode=Mode.SUBTRACT)


with BuildPart() as f1_6:
    add(f1_5.part)

    # F3_t51: cut F3_tool52
    add(f3_tool52.part, mode=Mode.SUBTRACT)


with BuildPart() as f3_tool58:
    # F3_s59 → F3_t60 (new body)
    with BuildSketch(Plane.XZ.offset(-6.2565470421)):
        with Locations((30.6716011147, 1.2446)):
            Rectangle(F3_S59_W, F3_S59_H)
    extrude(amount=F3_T60_DEPTH)

    # F3_s61 → F3_t62 (revolve, cut)
    with BuildSketch(Plane(origin=(29.3762011147, 6.2565470421, 2.54), x_dir=(-0.7071067812, 0, 0.7071067812), z_dir=(0.7071067812, 0, 0.7071067812))):
        with BuildLine():
            ThreePointArc((0, -2.54), (2.54, 0), (0, 2.54))
            Line((0, 2.54), (0, -2.54))
        make_face()
    revolve(axis=Axis((29.3762011147, 6.2565470421, 2.54), (0, -1, 0)), mode=Mode.SUBTRACT)


with BuildPart() as f1_7:
    add(f1_6.part)

    # F3_t57: cut F3_tool58
    add(f3_tool58.part, mode=Mode.SUBTRACT)


with BuildPart() as f3_tool64:
    # F3_s65 → F3_t66 (new body)
    with BuildSketch(Plane.XY.offset(3.81)):
        with Locations((30.6716011147, 4.9611470421)):
            Rectangle(F3_S65_W, F3_S65_H)
    extrude(amount=F3_T66_DEPTH)

    # F3_s67 → F3_t68 (revolve, cut)
    with BuildSketch(Plane(origin=(29.3762011147, 6.2565470421, 3.81), x_dir=(-0.7071067812, 0.7071067812, 0), z_dir=(0.7071067812, 0.7071067812, 0))):
        with BuildLine():
            ThreePointArc((0, -2.54), (2.54, 0), (0, 2.54))
            Line((0, 2.54), (0, -2.54))
        make_face()
    revolve(axis=Axis((29.3762011147, 6.2565470421, 3.81), (0, 0, 1)), mode=Mode.SUBTRACT)


with BuildPart() as f1_8:
    add(f1_7.part)

    # F3_t63: cut F3_tool64
    add(f3_tool64.part, mode=Mode.SUBTRACT)

    # F3_s69 → F3_t70 (revolve, cut)
    with BuildSketch(Plane.XY.offset(2.5399999999)):
        with BuildLine():
            ThreePointArc((29.3762011147, 33.7092466652), (31.1722523389, 32.9652978894), (31.9162011147, 31.1692466652))
            Line((31.9162011147, 31.1692466652), (31.9670011147, 31.1692466652))
            Line((31.9670011147, 31.1692466652), (31.9670011147, 33.7600466652))
            Line((31.9670011147, 33.7600466652), (29.3762011147, 33.7600466652))
            Line((29.3762011147, 33.7600466652), (29.3762011147, 33.7092466652))
        make_face()
    revolve(axis=Axis((31.9162011147, 31.1692466653, 2.5399999999), (-1, 0, 0)), revolution_arc=F3_T70_ANGLE, mode=Mode.SUBTRACT)

    # F3_s71 → F3_t72 (revolve, cut)
    with BuildSketch(Plane.XZ.offset(-31.1692466653)):
        with BuildLine():
            ThreePointArc((31.9162011147, 3.81), (31.1722523389, 5.6060512242), (29.3762011147, 6.35))
            Line((29.3762011147, 6.35), (29.3762011147, 6.4008))
            Line((29.3762011147, 6.4008), (31.9670011147, 6.4008))
            Line((31.9670011147, 6.4008), (31.9670011147, 3.81))
            Line((31.9670011147, 3.81), (31.9162011147, 3.81))
        make_face()
    revolve(axis=Axis((31.9162011147, 31.1692466653, 3.8100000001), (-1, 0, 0)), revolution_arc=F3_T72_ANGLE, mode=Mode.SUBTRACT)


with BuildPart() as f3_tool75:
    # F3_s76 → F3_t77 (new body)
    with BuildSketch(Plane.YZ.offset(-1.8957607284)):
        with BuildLine():
            ThreePointArc((6.2565470421, 0), (4.4604958179, 0.7439487758), (3.7165470421, 2.54))
            Line((3.7165470421, 2.54), (3.6657470421, 2.54))
            Line((3.6657470421, 2.54), (3.6657470421, -0.0508))
            Line((3.6657470421, -0.0508), (6.2565470421, -0.0508))
            Line((6.2565470421, -0.0508), (6.2565470421, 0))
        make_face()
    extrude(amount=F3_T77_DEPTH)

    split(bisect_by=Plane.YZ.offset(4.4542392716), keep=Keep.BOTTOM)


with BuildPart() as f3_tool79:
    # F3_s80 → F3_t81 (new body)
    with BuildSketch(Plane.XZ.offset(33.3753190935)):
        with BuildLine():
            ThreePointArc((1.9142392716, 0), (3.7102904958, 0.7439487758), (4.4542392716, 2.54))
            Line((4.4542392716, 2.54), (4.5050392716, 2.54))
            Line((4.5050392716, 2.54), (4.5050392716, -0.0508))
            Line((4.5050392716, -0.0508), (1.9142392716, -0.0508))
            Line((1.9142392716, -0.0508), (1.9142392716, 0))
        make_face()
    extrude(amount=-F3_T81_DEPTH)

    split(bisect_by=Plane.XZ.offset(-3.7165470421), keep=Keep.BOTTOM)


with BuildPart() as f3_tool75_1:
    add(f3_tool75.part)

    # F3_t83: intersect F3_tool79
    add(f3_tool79.part, mode=Mode.INTERSECT)


with BuildPart() as f1_9:
    add(f1_8.part)

    # F3_t73: cut F3_tool75
    add(f3_tool75_1.part, mode=Mode.SUBTRACT)


with BuildPart() as f3_tool86:
    # F3_s87 → F3_t88 (new body)
    with BuildSketch(Plane.XZ.offset(-10.0665470421)):
        with BuildLine():
            ThreePointArc((-1.9142392716, 0), (-3.7102904958, 0.7439487758), (-4.4542392716, 2.54))
            Line((-4.4542392716, 2.54), (-4.5050392716, 2.54))
            Line((-4.5050392716, 2.54), (-4.5050392716, -0.0508))
            Line((-4.5050392716, -0.0508), (-1.9142392716, -0.0508))
            Line((-1.9142392716, -0.0508), (-1.9142392716, 0))
        make_face()
    extrude(amount=F3_T88_DEPTH)

    split(bisect_by=Plane.XZ.offset(-3.7165470421), keep=Keep.BOTTOM)


with BuildPart() as f3_tool90:
    # F3_s91 → F3_t92 (new body)
    with BuildSketch(Plane.YZ.offset(-31.9162011147)):
        with BuildLine():
            ThreePointArc((6.2565470421, 0), (4.4604958179, 0.7439487758), (3.7165470421, 2.54))
            Line((3.7165470421, 2.54), (3.6657470421, 2.54))
            Line((3.6657470421, 2.54), (3.6657470421, -0.0508))
            Line((3.6657470421, -0.0508), (6.2565470421, -0.0508))
            Line((6.2565470421, -0.0508), (6.2565470421, 0))
        make_face()
    extrude(amount=F3_T92_DEPTH)

    split(bisect_by=Plane.YZ.offset(-4.4542392716), keep=Keep.TOP)


with BuildPart() as f3_tool86_1:
    add(f3_tool86.part)

    # F3_t94: intersect F3_tool90
    add(f3_tool90.part, mode=Mode.INTERSECT)


with BuildPart() as f1_10:
    add(f1_9.part)

    # F3_t84: cut F3_tool86
    add(f3_tool86_1.part, mode=Mode.SUBTRACT)


with BuildPart() as f3_tool97:
    # F3_s98 → F3_t99 (new body)
    with BuildSketch(Plane.YZ.offset(-38.2662011147)):
        with BuildLine():
            ThreePointArc((6.2565470421, 0), (4.4604958179, 0.7439487758), (3.7165470421, 2.54))
            Line((3.7165470421, 2.54), (3.6657470421, 2.54))
            Line((3.6657470421, 2.54), (3.6657470421, -0.0508))
            Line((3.6657470421, -0.0508), (6.2565470421, -0.0508))
            Line((6.2565470421, -0.0508), (6.2565470421, 0))
        make_face()
    extrude(amount=F3_T99_DEPTH)

    split(bisect_by=Plane.YZ.offset(-31.9162011147), keep=Keep.BOTTOM)


with BuildPart() as f3_tool101:
    # F3_s102 → F3_t103 (new body)
    with BuildSketch(Plane.XZ.offset(-31.1692466652)):
        with BuildLine():
            ThreePointArc((-29.3762011147, 0), (-31.1722523389, 0.7439487758), (-31.9162011147, 2.54))
            Line((-31.9162011147, 2.54), (-31.9670011147, 2.54))
            Line((-31.9670011147, 2.54), (-31.9670011147, -0.0508))
            Line((-31.9670011147, -0.0508), (-29.3762011147, -0.0508))
            Line((-29.3762011147, -0.0508), (-29.3762011147, 0))
        make_face()
    extrude(amount=F3_T103_DEPTH)

    split(bisect_by=Plane.XZ.offset(-3.7165470421), keep=Keep.TOP)


with BuildPart() as f3_tool97_1:
    add(f3_tool97.part)

    # F3_t105: intersect F3_tool101
    add(f3_tool101.part, mode=Mode.INTERSECT)


with BuildPart() as f1_11:
    add(f1_10.part)

    # F3_t95: cut F3_tool97
    add(f3_tool97_1.part, mode=Mode.SUBTRACT)


with BuildPart() as f3_tool108:
    # F3_s109 → F3_t110 (new body)
    with BuildSketch(Plane.YZ.offset(-1.8957607284)):
        with BuildLine():
            ThreePointArc((6.2565470421, 6.35), (4.4604958179, 5.6060512242), (3.7165470421, 3.81))
            Line((3.7165470421, 3.81), (3.6657470421, 3.81))
            Line((3.6657470421, 3.81), (3.6657470421, 6.4008))
            Line((3.6657470421, 6.4008), (6.2565470421, 6.4008))
            Line((6.2565470421, 6.4008), (6.2565470421, 6.35))
        make_face()
    extrude(amount=F3_T110_DEPTH)

    split(bisect_by=Plane.YZ.offset(4.4542392716), keep=Keep.BOTTOM)


with BuildPart() as f3_tool112:
    # F3_s113 → F3_t114 (new body)
    with BuildSketch(Plane.XZ.offset(33.3753190935)):
        with BuildLine():
            ThreePointArc((1.9142392716, 6.35), (3.7102904958, 5.6060512242), (4.4542392716, 3.81))
            Line((4.4542392716, 3.81), (4.5050392716, 3.81))
            Line((4.5050392716, 3.81), (4.5050392716, 6.4008))
            Line((4.5050392716, 6.4008), (1.9142392716, 6.4008))
            Line((1.9142392716, 6.4008), (1.9142392716, 6.35))
        make_face()
    extrude(amount=-F3_T114_DEPTH)

    split(bisect_by=Plane.XZ.offset(-3.7165470421), keep=Keep.BOTTOM)


with BuildPart() as f3_tool108_1:
    add(f3_tool108.part)

    # F3_t116: intersect F3_tool112
    add(f3_tool112.part, mode=Mode.INTERSECT)


with BuildPart() as f1_12:
    add(f1_11.part)

    # F3_t106: cut F3_tool108
    add(f3_tool108_1.part, mode=Mode.SUBTRACT)


with BuildPart() as f3_tool119:
    # F3_s120 → F3_t121 (new body)
    with BuildSketch(Plane.XZ.offset(-10.0665470421)):
        with BuildLine():
            ThreePointArc((-1.9142392716, 6.35), (-3.7102904958, 5.6060512242), (-4.4542392716, 3.81))
            Line((-4.4542392716, 3.81), (-4.5050392716, 3.81))
            Line((-4.5050392716, 3.81), (-4.5050392716, 6.4008))
            Line((-4.5050392716, 6.4008), (-1.9142392716, 6.4008))
            Line((-1.9142392716, 6.4008), (-1.9142392716, 6.35))
        make_face()
    extrude(amount=F3_T121_DEPTH)

    split(bisect_by=Plane.XZ.offset(-3.7165470421), keep=Keep.BOTTOM)


with BuildPart() as f3_tool123:
    # F3_s124 → F3_t125 (new body)
    with BuildSketch(Plane.YZ.offset(-31.9162011147)):
        with BuildLine():
            ThreePointArc((6.2565470421, 6.35), (4.4604958179, 5.6060512242), (3.7165470421, 3.81))
            Line((3.7165470421, 3.81), (3.6657470421, 3.81))
            Line((3.6657470421, 3.81), (3.6657470421, 6.4008))
            Line((3.6657470421, 6.4008), (6.2565470421, 6.4008))
            Line((6.2565470421, 6.4008), (6.2565470421, 6.35))
        make_face()
    extrude(amount=F3_T125_DEPTH)

    split(bisect_by=Plane.YZ.offset(-4.4542392716), keep=Keep.TOP)


with BuildPart() as f3_tool119_1:
    add(f3_tool119.part)

    # F3_t127: intersect F3_tool123
    add(f3_tool123.part, mode=Mode.INTERSECT)


with BuildPart() as f1_13:
    add(f1_12.part)

    # F3_t117: cut F3_tool119
    add(f3_tool119_1.part, mode=Mode.SUBTRACT)


with BuildPart() as f3_tool130:
    # F3_s131 → F3_t132 (new body)
    with BuildSketch(Plane.YZ.offset(-38.2662011147)):
        with BuildLine():
            ThreePointArc((6.2565470421, 6.35), (4.4604958179, 5.6060512242), (3.7165470421, 3.81))
            Line((3.7165470421, 3.81), (3.6657470421, 3.81))
            Line((3.6657470421, 3.81), (3.6657470421, 6.4008))
            Line((3.6657470421, 6.4008), (6.2565470421, 6.4008))
            Line((6.2565470421, 6.4008), (6.2565470421, 6.35))
        make_face()
    extrude(amount=F3_T132_DEPTH)

    split(bisect_by=Plane.YZ.offset(-31.9162011147), keep=Keep.BOTTOM)


with BuildPart() as f3_tool134:
    # F3_s135 → F3_t136 (new body)
    with BuildSketch(Plane.XZ.offset(2.6334529579)):
        with BuildLine():
            ThreePointArc((-29.3762011147, 6.35), (-31.1722523389, 5.6060512242), (-31.9162011147, 3.81))
            Line((-31.9162011147, 3.81), (-31.9670011147, 3.81))
            Line((-31.9670011147, 3.81), (-31.9670011147, 6.4008))
            Line((-31.9670011147, 6.4008), (-29.3762011147, 6.4008))
            Line((-29.3762011147, 6.4008), (-29.3762011147, 6.35))
        make_face()
    extrude(amount=-F3_T136_DEPTH)

    split(bisect_by=Plane.XZ.offset(-3.7165470421), keep=Keep.TOP)


with BuildPart() as f3_tool130_1:
    add(f3_tool130.part)

    # F3_t138: intersect F3_tool134
    add(f3_tool134.part, mode=Mode.INTERSECT)


with BuildPart() as f1_14:
    add(f1_13.part)

    # F3_t128: cut F3_tool130
    add(f3_tool130_1.part, mode=Mode.SUBTRACT)


solid = f1_14.part
